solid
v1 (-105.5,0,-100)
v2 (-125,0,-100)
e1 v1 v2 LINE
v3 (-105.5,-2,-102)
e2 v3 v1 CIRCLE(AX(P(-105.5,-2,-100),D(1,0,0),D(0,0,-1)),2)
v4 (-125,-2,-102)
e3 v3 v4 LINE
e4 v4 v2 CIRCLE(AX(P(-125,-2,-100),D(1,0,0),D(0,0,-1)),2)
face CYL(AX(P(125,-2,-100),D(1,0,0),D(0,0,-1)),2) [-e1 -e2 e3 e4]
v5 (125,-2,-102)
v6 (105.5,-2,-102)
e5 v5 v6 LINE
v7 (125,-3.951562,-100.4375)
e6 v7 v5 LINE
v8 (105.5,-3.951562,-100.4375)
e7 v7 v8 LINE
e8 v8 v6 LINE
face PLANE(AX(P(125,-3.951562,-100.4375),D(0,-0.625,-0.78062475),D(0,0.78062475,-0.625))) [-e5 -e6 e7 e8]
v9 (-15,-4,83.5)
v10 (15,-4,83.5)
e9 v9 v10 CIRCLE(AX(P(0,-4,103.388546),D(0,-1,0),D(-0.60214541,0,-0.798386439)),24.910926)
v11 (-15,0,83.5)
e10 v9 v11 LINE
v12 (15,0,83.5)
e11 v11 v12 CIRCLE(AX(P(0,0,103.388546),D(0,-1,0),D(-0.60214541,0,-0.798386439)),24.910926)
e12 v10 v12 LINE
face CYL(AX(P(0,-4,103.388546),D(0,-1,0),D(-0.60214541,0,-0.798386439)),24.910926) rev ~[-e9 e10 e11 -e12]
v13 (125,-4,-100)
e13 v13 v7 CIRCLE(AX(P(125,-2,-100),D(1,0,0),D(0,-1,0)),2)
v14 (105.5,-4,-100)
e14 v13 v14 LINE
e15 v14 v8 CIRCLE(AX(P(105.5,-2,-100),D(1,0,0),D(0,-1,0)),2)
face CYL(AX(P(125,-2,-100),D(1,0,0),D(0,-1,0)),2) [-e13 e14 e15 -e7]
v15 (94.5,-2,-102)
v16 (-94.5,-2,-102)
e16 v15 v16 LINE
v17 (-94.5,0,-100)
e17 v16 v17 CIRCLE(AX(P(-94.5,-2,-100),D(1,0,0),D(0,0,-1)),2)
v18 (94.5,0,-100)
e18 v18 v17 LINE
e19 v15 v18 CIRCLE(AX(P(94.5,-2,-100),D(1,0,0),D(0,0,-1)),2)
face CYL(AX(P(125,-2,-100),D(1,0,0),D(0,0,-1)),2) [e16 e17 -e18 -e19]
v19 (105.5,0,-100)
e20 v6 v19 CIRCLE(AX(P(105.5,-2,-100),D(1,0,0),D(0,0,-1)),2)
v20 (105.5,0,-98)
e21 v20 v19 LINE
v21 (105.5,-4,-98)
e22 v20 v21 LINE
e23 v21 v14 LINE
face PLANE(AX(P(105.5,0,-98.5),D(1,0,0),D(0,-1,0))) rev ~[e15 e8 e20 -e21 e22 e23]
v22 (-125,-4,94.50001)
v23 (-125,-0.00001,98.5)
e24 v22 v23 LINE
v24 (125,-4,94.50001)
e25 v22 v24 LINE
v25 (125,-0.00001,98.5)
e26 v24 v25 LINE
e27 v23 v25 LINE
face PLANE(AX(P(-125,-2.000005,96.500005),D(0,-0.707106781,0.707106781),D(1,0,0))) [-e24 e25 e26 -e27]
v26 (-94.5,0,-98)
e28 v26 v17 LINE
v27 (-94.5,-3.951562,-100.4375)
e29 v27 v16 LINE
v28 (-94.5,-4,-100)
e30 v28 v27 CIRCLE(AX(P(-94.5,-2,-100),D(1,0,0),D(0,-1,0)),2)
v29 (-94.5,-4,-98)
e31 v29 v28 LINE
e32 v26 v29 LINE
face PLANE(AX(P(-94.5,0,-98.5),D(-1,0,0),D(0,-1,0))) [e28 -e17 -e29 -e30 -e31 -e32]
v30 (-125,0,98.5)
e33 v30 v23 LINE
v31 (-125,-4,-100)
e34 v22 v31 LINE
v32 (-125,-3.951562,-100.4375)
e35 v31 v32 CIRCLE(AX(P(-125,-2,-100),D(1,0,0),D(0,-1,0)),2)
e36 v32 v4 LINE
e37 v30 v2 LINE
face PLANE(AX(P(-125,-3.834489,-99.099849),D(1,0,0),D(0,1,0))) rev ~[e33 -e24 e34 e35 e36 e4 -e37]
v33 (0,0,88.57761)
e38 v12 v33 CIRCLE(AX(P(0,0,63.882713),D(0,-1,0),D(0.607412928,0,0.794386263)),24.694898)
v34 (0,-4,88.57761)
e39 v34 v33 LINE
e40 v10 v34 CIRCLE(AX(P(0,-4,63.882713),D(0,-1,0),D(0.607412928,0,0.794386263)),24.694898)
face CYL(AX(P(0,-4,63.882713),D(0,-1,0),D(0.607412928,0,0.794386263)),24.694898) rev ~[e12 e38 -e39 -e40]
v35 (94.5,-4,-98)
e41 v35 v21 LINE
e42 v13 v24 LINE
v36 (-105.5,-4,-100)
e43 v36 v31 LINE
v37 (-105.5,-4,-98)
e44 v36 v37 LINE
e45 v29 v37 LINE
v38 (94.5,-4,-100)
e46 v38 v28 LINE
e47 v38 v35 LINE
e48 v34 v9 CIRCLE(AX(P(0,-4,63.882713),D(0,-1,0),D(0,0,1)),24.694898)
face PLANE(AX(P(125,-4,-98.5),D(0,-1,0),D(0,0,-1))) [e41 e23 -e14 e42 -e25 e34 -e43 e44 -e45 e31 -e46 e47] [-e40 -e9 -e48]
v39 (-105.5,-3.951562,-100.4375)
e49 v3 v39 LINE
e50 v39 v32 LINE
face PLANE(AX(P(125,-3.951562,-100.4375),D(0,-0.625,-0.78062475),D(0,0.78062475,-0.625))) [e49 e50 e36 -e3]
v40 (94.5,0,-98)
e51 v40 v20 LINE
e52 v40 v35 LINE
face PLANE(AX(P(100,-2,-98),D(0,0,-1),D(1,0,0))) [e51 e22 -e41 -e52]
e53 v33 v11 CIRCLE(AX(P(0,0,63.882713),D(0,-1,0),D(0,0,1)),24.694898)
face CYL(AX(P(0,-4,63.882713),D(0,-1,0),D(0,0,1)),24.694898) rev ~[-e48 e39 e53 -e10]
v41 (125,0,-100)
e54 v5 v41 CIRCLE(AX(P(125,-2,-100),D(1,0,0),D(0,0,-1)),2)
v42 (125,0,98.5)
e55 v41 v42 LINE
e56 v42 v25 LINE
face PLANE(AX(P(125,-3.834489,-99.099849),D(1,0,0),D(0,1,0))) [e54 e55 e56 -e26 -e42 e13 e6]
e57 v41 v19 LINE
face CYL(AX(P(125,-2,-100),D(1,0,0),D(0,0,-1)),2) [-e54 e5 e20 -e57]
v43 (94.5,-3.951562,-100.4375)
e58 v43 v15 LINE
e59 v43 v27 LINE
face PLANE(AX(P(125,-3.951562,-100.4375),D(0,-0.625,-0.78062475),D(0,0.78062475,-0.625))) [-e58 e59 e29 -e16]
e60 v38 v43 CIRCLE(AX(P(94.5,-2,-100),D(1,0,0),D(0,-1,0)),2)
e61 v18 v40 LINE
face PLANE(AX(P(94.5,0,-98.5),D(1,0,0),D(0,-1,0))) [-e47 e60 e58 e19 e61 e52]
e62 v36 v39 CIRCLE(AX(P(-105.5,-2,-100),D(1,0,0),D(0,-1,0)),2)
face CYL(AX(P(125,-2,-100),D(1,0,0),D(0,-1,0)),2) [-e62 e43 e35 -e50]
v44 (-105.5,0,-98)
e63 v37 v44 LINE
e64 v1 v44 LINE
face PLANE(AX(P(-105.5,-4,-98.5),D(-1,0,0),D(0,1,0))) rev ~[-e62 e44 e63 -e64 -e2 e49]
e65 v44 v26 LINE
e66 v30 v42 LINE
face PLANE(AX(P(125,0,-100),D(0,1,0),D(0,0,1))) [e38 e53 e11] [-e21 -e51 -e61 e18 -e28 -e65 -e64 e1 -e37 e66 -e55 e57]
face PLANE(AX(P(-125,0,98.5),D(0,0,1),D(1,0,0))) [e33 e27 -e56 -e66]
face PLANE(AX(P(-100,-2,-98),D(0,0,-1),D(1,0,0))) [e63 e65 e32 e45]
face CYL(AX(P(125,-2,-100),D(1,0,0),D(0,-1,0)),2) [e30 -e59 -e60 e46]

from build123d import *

# Parameters (mm, degrees)
F0_W     = 250
F0_H     = 197
F1_DEPTH = 4
F3_W     = 11
F3_H     = 4
F4_DEPTH = 0.5
F5_DEPTH = 250
F6_DEPTH = 25
F8_DEPTH = 25
F9_SIZE  = 3.99999


# Not quite as in the source:
# - a fillet or chamfer is up to 0.001 mm smaller than in the source, because OpenCascade refuses the exact size


with BuildPart() as f1:
    # F0 (on Front) → F1 (new body)
    with BuildSketch(Plane.XZ):
        Rectangle(F0_W, F0_H)
    extrude(amount=F1_DEPTH)

    # F3 (on face) → F4 (cut)
    with BuildSketch(Plane(origin=(0, 0, -98.5), x_dir=(1, 0, 0), z_dir=(0, 0, -1))):
        Polygon((-105.5, 0), (-94.5, 0), (-94.5, 4), (-105.5, 4), (-105.5, 2), align=None)
        with Locations((100, 2)):
            Rectangle(F3_W, F3_H)
    extrude(amount=-F4_DEPTH, mode=Mode.SUBTRACT)

    # F2 (on face) → F5 (join)
    with BuildSketch(Plane.YZ.offset(125)):
        with BuildLine():
            Line((-3.3228756555, -98.5), (-4, -98.5))
            Line((-4, -98.5), (-4, -100))
            ThreePointArc((-4, -100), (-3.8228756555, -99.1771243445), (-3.3228756555, -98.5))
        make_face()
        with BuildLine():
            ThreePointArc((-3.3228756555, -98.5), (-3.8228756555, -99.1771243445), (-4, -100))
            Line((-4, -100), (0, -100))
            ThreePointArc((0, -100), (-0.1771243445, -99.1771243445), (-0.6771243445, -98.5))
            Line((-0.6771243445, -98.5), (-3.3228756555, -98.5))
        make_face()
        with BuildLine():
            ThreePointArc((-0.6771243445, -98.5), (-0.1771243445, -99.1771243445), (0, -100))
            Line((0, -100), (0, -98.5))
            Line((0, -98.5), (-0.6771243445, -98.5))
        make_face()
        with BuildLine():
            Line((0, -100), (-4, -100))
            ThreePointArc((-4, -100), (-3.9878535848, -100.2200866318), (-3.9515618745, -100.4375))
            Line((-3.9515618745, -100.4375), (-2, -102))
            ThreePointArc((-2, -102), (-0.5857864376, -101.4142135624), (0, -100))
        make_face()
    extrude(amount=-F5_DEPTH)

    # F3 (on face) → F6 (cut)
    with BuildSketch(Plane(origin=(0, 0, -98.5), x_dir=(1, 0, 0), z_dir=(0, 0, -1))):
        Polygon((-105.5, 0), (-94.5, 0), (-94.5, 4), (-105.5, 4), (-105.5, 2), align=None)
        with Locations((100, 2)):
            Rectangle(F3_W, F3_H)
    extrude(amount=F6_DEPTH, mode=Mode.SUBTRACT)

    # F7 (on face) → F8 (cut)
    with BuildSketch(Plane.XZ.offset(4)):
        with BuildLine():
            ThreePointArc((-15, 83.5), (0, 78.4776194071), (15, 83.5))
            Line((15, 83.5), (5, 83.5))
            ThreePointArc((5, 83.5), (0, 78.5), (-5, 83.5))
            Line((-5, 83.5), (-15, 83.5))
        make_face()
        with BuildLine():
            Line((5, 83.5), (0, 83.5))
            Line((0, 83.5), (-5, 83.5))
            ThreePointArc((-5, 83.5), (0, 78.5), (5, 83.5))
        make_face()
        with BuildLine():
            Line((0, 83.5), (0, 88.5))
            ThreePointArc((0, 88.5), (-3.5355339059, 87.0355339059), (-5, 83.5))
            Line((-5, 83.5), (0, 83.5))
        make_face()
        with BuildLine():
            Line((0, 88.5), (0, 88.5776101571))
            ThreePointArc((0, 88.5776101571), (-7.918050974, 87.2737885484), (-15, 83.5))
            Line((-15, 83.5), (-5, 83.5))
            ThreePointArc((-5, 83.5), (-3.5355339059, 87.0355339059), (0, 88.5))
        make_face()
        with BuildLine():
            ThreePointArc((5, 83.5), (3.5355339059, 87.0355339059), (0, 88.5))
            Line((0, 88.5), (0, 83.5))
            Line((0, 83.5), (5, 83.5))
        make_face()
        with BuildLine():
            ThreePointArc((15, 83.5), (7.918050974, 87.2737885484), (0, 88.5776101571))
            Line((0, 88.5776101571), (0, 88.5))
            ThreePointArc((0, 88.5), (3.5355339059, 87.0355339059), (5, 83.5))
            Line((5, 83.5), (15, 83.5))
        make_face()
    extrude(amount=-F8_DEPTH, mode=Mode.SUBTRACT)

    # F9 (size 4 in the source; OpenCascade refuses exactly that, so slightly less here)
    f9_edges = [f1.edges().sort_by_distance(p)[0] for p in [
        (0, -4, 98.5),
    ]]
    chamfer(f9_edges, length=F9_SIZE)


solid = f1.part
